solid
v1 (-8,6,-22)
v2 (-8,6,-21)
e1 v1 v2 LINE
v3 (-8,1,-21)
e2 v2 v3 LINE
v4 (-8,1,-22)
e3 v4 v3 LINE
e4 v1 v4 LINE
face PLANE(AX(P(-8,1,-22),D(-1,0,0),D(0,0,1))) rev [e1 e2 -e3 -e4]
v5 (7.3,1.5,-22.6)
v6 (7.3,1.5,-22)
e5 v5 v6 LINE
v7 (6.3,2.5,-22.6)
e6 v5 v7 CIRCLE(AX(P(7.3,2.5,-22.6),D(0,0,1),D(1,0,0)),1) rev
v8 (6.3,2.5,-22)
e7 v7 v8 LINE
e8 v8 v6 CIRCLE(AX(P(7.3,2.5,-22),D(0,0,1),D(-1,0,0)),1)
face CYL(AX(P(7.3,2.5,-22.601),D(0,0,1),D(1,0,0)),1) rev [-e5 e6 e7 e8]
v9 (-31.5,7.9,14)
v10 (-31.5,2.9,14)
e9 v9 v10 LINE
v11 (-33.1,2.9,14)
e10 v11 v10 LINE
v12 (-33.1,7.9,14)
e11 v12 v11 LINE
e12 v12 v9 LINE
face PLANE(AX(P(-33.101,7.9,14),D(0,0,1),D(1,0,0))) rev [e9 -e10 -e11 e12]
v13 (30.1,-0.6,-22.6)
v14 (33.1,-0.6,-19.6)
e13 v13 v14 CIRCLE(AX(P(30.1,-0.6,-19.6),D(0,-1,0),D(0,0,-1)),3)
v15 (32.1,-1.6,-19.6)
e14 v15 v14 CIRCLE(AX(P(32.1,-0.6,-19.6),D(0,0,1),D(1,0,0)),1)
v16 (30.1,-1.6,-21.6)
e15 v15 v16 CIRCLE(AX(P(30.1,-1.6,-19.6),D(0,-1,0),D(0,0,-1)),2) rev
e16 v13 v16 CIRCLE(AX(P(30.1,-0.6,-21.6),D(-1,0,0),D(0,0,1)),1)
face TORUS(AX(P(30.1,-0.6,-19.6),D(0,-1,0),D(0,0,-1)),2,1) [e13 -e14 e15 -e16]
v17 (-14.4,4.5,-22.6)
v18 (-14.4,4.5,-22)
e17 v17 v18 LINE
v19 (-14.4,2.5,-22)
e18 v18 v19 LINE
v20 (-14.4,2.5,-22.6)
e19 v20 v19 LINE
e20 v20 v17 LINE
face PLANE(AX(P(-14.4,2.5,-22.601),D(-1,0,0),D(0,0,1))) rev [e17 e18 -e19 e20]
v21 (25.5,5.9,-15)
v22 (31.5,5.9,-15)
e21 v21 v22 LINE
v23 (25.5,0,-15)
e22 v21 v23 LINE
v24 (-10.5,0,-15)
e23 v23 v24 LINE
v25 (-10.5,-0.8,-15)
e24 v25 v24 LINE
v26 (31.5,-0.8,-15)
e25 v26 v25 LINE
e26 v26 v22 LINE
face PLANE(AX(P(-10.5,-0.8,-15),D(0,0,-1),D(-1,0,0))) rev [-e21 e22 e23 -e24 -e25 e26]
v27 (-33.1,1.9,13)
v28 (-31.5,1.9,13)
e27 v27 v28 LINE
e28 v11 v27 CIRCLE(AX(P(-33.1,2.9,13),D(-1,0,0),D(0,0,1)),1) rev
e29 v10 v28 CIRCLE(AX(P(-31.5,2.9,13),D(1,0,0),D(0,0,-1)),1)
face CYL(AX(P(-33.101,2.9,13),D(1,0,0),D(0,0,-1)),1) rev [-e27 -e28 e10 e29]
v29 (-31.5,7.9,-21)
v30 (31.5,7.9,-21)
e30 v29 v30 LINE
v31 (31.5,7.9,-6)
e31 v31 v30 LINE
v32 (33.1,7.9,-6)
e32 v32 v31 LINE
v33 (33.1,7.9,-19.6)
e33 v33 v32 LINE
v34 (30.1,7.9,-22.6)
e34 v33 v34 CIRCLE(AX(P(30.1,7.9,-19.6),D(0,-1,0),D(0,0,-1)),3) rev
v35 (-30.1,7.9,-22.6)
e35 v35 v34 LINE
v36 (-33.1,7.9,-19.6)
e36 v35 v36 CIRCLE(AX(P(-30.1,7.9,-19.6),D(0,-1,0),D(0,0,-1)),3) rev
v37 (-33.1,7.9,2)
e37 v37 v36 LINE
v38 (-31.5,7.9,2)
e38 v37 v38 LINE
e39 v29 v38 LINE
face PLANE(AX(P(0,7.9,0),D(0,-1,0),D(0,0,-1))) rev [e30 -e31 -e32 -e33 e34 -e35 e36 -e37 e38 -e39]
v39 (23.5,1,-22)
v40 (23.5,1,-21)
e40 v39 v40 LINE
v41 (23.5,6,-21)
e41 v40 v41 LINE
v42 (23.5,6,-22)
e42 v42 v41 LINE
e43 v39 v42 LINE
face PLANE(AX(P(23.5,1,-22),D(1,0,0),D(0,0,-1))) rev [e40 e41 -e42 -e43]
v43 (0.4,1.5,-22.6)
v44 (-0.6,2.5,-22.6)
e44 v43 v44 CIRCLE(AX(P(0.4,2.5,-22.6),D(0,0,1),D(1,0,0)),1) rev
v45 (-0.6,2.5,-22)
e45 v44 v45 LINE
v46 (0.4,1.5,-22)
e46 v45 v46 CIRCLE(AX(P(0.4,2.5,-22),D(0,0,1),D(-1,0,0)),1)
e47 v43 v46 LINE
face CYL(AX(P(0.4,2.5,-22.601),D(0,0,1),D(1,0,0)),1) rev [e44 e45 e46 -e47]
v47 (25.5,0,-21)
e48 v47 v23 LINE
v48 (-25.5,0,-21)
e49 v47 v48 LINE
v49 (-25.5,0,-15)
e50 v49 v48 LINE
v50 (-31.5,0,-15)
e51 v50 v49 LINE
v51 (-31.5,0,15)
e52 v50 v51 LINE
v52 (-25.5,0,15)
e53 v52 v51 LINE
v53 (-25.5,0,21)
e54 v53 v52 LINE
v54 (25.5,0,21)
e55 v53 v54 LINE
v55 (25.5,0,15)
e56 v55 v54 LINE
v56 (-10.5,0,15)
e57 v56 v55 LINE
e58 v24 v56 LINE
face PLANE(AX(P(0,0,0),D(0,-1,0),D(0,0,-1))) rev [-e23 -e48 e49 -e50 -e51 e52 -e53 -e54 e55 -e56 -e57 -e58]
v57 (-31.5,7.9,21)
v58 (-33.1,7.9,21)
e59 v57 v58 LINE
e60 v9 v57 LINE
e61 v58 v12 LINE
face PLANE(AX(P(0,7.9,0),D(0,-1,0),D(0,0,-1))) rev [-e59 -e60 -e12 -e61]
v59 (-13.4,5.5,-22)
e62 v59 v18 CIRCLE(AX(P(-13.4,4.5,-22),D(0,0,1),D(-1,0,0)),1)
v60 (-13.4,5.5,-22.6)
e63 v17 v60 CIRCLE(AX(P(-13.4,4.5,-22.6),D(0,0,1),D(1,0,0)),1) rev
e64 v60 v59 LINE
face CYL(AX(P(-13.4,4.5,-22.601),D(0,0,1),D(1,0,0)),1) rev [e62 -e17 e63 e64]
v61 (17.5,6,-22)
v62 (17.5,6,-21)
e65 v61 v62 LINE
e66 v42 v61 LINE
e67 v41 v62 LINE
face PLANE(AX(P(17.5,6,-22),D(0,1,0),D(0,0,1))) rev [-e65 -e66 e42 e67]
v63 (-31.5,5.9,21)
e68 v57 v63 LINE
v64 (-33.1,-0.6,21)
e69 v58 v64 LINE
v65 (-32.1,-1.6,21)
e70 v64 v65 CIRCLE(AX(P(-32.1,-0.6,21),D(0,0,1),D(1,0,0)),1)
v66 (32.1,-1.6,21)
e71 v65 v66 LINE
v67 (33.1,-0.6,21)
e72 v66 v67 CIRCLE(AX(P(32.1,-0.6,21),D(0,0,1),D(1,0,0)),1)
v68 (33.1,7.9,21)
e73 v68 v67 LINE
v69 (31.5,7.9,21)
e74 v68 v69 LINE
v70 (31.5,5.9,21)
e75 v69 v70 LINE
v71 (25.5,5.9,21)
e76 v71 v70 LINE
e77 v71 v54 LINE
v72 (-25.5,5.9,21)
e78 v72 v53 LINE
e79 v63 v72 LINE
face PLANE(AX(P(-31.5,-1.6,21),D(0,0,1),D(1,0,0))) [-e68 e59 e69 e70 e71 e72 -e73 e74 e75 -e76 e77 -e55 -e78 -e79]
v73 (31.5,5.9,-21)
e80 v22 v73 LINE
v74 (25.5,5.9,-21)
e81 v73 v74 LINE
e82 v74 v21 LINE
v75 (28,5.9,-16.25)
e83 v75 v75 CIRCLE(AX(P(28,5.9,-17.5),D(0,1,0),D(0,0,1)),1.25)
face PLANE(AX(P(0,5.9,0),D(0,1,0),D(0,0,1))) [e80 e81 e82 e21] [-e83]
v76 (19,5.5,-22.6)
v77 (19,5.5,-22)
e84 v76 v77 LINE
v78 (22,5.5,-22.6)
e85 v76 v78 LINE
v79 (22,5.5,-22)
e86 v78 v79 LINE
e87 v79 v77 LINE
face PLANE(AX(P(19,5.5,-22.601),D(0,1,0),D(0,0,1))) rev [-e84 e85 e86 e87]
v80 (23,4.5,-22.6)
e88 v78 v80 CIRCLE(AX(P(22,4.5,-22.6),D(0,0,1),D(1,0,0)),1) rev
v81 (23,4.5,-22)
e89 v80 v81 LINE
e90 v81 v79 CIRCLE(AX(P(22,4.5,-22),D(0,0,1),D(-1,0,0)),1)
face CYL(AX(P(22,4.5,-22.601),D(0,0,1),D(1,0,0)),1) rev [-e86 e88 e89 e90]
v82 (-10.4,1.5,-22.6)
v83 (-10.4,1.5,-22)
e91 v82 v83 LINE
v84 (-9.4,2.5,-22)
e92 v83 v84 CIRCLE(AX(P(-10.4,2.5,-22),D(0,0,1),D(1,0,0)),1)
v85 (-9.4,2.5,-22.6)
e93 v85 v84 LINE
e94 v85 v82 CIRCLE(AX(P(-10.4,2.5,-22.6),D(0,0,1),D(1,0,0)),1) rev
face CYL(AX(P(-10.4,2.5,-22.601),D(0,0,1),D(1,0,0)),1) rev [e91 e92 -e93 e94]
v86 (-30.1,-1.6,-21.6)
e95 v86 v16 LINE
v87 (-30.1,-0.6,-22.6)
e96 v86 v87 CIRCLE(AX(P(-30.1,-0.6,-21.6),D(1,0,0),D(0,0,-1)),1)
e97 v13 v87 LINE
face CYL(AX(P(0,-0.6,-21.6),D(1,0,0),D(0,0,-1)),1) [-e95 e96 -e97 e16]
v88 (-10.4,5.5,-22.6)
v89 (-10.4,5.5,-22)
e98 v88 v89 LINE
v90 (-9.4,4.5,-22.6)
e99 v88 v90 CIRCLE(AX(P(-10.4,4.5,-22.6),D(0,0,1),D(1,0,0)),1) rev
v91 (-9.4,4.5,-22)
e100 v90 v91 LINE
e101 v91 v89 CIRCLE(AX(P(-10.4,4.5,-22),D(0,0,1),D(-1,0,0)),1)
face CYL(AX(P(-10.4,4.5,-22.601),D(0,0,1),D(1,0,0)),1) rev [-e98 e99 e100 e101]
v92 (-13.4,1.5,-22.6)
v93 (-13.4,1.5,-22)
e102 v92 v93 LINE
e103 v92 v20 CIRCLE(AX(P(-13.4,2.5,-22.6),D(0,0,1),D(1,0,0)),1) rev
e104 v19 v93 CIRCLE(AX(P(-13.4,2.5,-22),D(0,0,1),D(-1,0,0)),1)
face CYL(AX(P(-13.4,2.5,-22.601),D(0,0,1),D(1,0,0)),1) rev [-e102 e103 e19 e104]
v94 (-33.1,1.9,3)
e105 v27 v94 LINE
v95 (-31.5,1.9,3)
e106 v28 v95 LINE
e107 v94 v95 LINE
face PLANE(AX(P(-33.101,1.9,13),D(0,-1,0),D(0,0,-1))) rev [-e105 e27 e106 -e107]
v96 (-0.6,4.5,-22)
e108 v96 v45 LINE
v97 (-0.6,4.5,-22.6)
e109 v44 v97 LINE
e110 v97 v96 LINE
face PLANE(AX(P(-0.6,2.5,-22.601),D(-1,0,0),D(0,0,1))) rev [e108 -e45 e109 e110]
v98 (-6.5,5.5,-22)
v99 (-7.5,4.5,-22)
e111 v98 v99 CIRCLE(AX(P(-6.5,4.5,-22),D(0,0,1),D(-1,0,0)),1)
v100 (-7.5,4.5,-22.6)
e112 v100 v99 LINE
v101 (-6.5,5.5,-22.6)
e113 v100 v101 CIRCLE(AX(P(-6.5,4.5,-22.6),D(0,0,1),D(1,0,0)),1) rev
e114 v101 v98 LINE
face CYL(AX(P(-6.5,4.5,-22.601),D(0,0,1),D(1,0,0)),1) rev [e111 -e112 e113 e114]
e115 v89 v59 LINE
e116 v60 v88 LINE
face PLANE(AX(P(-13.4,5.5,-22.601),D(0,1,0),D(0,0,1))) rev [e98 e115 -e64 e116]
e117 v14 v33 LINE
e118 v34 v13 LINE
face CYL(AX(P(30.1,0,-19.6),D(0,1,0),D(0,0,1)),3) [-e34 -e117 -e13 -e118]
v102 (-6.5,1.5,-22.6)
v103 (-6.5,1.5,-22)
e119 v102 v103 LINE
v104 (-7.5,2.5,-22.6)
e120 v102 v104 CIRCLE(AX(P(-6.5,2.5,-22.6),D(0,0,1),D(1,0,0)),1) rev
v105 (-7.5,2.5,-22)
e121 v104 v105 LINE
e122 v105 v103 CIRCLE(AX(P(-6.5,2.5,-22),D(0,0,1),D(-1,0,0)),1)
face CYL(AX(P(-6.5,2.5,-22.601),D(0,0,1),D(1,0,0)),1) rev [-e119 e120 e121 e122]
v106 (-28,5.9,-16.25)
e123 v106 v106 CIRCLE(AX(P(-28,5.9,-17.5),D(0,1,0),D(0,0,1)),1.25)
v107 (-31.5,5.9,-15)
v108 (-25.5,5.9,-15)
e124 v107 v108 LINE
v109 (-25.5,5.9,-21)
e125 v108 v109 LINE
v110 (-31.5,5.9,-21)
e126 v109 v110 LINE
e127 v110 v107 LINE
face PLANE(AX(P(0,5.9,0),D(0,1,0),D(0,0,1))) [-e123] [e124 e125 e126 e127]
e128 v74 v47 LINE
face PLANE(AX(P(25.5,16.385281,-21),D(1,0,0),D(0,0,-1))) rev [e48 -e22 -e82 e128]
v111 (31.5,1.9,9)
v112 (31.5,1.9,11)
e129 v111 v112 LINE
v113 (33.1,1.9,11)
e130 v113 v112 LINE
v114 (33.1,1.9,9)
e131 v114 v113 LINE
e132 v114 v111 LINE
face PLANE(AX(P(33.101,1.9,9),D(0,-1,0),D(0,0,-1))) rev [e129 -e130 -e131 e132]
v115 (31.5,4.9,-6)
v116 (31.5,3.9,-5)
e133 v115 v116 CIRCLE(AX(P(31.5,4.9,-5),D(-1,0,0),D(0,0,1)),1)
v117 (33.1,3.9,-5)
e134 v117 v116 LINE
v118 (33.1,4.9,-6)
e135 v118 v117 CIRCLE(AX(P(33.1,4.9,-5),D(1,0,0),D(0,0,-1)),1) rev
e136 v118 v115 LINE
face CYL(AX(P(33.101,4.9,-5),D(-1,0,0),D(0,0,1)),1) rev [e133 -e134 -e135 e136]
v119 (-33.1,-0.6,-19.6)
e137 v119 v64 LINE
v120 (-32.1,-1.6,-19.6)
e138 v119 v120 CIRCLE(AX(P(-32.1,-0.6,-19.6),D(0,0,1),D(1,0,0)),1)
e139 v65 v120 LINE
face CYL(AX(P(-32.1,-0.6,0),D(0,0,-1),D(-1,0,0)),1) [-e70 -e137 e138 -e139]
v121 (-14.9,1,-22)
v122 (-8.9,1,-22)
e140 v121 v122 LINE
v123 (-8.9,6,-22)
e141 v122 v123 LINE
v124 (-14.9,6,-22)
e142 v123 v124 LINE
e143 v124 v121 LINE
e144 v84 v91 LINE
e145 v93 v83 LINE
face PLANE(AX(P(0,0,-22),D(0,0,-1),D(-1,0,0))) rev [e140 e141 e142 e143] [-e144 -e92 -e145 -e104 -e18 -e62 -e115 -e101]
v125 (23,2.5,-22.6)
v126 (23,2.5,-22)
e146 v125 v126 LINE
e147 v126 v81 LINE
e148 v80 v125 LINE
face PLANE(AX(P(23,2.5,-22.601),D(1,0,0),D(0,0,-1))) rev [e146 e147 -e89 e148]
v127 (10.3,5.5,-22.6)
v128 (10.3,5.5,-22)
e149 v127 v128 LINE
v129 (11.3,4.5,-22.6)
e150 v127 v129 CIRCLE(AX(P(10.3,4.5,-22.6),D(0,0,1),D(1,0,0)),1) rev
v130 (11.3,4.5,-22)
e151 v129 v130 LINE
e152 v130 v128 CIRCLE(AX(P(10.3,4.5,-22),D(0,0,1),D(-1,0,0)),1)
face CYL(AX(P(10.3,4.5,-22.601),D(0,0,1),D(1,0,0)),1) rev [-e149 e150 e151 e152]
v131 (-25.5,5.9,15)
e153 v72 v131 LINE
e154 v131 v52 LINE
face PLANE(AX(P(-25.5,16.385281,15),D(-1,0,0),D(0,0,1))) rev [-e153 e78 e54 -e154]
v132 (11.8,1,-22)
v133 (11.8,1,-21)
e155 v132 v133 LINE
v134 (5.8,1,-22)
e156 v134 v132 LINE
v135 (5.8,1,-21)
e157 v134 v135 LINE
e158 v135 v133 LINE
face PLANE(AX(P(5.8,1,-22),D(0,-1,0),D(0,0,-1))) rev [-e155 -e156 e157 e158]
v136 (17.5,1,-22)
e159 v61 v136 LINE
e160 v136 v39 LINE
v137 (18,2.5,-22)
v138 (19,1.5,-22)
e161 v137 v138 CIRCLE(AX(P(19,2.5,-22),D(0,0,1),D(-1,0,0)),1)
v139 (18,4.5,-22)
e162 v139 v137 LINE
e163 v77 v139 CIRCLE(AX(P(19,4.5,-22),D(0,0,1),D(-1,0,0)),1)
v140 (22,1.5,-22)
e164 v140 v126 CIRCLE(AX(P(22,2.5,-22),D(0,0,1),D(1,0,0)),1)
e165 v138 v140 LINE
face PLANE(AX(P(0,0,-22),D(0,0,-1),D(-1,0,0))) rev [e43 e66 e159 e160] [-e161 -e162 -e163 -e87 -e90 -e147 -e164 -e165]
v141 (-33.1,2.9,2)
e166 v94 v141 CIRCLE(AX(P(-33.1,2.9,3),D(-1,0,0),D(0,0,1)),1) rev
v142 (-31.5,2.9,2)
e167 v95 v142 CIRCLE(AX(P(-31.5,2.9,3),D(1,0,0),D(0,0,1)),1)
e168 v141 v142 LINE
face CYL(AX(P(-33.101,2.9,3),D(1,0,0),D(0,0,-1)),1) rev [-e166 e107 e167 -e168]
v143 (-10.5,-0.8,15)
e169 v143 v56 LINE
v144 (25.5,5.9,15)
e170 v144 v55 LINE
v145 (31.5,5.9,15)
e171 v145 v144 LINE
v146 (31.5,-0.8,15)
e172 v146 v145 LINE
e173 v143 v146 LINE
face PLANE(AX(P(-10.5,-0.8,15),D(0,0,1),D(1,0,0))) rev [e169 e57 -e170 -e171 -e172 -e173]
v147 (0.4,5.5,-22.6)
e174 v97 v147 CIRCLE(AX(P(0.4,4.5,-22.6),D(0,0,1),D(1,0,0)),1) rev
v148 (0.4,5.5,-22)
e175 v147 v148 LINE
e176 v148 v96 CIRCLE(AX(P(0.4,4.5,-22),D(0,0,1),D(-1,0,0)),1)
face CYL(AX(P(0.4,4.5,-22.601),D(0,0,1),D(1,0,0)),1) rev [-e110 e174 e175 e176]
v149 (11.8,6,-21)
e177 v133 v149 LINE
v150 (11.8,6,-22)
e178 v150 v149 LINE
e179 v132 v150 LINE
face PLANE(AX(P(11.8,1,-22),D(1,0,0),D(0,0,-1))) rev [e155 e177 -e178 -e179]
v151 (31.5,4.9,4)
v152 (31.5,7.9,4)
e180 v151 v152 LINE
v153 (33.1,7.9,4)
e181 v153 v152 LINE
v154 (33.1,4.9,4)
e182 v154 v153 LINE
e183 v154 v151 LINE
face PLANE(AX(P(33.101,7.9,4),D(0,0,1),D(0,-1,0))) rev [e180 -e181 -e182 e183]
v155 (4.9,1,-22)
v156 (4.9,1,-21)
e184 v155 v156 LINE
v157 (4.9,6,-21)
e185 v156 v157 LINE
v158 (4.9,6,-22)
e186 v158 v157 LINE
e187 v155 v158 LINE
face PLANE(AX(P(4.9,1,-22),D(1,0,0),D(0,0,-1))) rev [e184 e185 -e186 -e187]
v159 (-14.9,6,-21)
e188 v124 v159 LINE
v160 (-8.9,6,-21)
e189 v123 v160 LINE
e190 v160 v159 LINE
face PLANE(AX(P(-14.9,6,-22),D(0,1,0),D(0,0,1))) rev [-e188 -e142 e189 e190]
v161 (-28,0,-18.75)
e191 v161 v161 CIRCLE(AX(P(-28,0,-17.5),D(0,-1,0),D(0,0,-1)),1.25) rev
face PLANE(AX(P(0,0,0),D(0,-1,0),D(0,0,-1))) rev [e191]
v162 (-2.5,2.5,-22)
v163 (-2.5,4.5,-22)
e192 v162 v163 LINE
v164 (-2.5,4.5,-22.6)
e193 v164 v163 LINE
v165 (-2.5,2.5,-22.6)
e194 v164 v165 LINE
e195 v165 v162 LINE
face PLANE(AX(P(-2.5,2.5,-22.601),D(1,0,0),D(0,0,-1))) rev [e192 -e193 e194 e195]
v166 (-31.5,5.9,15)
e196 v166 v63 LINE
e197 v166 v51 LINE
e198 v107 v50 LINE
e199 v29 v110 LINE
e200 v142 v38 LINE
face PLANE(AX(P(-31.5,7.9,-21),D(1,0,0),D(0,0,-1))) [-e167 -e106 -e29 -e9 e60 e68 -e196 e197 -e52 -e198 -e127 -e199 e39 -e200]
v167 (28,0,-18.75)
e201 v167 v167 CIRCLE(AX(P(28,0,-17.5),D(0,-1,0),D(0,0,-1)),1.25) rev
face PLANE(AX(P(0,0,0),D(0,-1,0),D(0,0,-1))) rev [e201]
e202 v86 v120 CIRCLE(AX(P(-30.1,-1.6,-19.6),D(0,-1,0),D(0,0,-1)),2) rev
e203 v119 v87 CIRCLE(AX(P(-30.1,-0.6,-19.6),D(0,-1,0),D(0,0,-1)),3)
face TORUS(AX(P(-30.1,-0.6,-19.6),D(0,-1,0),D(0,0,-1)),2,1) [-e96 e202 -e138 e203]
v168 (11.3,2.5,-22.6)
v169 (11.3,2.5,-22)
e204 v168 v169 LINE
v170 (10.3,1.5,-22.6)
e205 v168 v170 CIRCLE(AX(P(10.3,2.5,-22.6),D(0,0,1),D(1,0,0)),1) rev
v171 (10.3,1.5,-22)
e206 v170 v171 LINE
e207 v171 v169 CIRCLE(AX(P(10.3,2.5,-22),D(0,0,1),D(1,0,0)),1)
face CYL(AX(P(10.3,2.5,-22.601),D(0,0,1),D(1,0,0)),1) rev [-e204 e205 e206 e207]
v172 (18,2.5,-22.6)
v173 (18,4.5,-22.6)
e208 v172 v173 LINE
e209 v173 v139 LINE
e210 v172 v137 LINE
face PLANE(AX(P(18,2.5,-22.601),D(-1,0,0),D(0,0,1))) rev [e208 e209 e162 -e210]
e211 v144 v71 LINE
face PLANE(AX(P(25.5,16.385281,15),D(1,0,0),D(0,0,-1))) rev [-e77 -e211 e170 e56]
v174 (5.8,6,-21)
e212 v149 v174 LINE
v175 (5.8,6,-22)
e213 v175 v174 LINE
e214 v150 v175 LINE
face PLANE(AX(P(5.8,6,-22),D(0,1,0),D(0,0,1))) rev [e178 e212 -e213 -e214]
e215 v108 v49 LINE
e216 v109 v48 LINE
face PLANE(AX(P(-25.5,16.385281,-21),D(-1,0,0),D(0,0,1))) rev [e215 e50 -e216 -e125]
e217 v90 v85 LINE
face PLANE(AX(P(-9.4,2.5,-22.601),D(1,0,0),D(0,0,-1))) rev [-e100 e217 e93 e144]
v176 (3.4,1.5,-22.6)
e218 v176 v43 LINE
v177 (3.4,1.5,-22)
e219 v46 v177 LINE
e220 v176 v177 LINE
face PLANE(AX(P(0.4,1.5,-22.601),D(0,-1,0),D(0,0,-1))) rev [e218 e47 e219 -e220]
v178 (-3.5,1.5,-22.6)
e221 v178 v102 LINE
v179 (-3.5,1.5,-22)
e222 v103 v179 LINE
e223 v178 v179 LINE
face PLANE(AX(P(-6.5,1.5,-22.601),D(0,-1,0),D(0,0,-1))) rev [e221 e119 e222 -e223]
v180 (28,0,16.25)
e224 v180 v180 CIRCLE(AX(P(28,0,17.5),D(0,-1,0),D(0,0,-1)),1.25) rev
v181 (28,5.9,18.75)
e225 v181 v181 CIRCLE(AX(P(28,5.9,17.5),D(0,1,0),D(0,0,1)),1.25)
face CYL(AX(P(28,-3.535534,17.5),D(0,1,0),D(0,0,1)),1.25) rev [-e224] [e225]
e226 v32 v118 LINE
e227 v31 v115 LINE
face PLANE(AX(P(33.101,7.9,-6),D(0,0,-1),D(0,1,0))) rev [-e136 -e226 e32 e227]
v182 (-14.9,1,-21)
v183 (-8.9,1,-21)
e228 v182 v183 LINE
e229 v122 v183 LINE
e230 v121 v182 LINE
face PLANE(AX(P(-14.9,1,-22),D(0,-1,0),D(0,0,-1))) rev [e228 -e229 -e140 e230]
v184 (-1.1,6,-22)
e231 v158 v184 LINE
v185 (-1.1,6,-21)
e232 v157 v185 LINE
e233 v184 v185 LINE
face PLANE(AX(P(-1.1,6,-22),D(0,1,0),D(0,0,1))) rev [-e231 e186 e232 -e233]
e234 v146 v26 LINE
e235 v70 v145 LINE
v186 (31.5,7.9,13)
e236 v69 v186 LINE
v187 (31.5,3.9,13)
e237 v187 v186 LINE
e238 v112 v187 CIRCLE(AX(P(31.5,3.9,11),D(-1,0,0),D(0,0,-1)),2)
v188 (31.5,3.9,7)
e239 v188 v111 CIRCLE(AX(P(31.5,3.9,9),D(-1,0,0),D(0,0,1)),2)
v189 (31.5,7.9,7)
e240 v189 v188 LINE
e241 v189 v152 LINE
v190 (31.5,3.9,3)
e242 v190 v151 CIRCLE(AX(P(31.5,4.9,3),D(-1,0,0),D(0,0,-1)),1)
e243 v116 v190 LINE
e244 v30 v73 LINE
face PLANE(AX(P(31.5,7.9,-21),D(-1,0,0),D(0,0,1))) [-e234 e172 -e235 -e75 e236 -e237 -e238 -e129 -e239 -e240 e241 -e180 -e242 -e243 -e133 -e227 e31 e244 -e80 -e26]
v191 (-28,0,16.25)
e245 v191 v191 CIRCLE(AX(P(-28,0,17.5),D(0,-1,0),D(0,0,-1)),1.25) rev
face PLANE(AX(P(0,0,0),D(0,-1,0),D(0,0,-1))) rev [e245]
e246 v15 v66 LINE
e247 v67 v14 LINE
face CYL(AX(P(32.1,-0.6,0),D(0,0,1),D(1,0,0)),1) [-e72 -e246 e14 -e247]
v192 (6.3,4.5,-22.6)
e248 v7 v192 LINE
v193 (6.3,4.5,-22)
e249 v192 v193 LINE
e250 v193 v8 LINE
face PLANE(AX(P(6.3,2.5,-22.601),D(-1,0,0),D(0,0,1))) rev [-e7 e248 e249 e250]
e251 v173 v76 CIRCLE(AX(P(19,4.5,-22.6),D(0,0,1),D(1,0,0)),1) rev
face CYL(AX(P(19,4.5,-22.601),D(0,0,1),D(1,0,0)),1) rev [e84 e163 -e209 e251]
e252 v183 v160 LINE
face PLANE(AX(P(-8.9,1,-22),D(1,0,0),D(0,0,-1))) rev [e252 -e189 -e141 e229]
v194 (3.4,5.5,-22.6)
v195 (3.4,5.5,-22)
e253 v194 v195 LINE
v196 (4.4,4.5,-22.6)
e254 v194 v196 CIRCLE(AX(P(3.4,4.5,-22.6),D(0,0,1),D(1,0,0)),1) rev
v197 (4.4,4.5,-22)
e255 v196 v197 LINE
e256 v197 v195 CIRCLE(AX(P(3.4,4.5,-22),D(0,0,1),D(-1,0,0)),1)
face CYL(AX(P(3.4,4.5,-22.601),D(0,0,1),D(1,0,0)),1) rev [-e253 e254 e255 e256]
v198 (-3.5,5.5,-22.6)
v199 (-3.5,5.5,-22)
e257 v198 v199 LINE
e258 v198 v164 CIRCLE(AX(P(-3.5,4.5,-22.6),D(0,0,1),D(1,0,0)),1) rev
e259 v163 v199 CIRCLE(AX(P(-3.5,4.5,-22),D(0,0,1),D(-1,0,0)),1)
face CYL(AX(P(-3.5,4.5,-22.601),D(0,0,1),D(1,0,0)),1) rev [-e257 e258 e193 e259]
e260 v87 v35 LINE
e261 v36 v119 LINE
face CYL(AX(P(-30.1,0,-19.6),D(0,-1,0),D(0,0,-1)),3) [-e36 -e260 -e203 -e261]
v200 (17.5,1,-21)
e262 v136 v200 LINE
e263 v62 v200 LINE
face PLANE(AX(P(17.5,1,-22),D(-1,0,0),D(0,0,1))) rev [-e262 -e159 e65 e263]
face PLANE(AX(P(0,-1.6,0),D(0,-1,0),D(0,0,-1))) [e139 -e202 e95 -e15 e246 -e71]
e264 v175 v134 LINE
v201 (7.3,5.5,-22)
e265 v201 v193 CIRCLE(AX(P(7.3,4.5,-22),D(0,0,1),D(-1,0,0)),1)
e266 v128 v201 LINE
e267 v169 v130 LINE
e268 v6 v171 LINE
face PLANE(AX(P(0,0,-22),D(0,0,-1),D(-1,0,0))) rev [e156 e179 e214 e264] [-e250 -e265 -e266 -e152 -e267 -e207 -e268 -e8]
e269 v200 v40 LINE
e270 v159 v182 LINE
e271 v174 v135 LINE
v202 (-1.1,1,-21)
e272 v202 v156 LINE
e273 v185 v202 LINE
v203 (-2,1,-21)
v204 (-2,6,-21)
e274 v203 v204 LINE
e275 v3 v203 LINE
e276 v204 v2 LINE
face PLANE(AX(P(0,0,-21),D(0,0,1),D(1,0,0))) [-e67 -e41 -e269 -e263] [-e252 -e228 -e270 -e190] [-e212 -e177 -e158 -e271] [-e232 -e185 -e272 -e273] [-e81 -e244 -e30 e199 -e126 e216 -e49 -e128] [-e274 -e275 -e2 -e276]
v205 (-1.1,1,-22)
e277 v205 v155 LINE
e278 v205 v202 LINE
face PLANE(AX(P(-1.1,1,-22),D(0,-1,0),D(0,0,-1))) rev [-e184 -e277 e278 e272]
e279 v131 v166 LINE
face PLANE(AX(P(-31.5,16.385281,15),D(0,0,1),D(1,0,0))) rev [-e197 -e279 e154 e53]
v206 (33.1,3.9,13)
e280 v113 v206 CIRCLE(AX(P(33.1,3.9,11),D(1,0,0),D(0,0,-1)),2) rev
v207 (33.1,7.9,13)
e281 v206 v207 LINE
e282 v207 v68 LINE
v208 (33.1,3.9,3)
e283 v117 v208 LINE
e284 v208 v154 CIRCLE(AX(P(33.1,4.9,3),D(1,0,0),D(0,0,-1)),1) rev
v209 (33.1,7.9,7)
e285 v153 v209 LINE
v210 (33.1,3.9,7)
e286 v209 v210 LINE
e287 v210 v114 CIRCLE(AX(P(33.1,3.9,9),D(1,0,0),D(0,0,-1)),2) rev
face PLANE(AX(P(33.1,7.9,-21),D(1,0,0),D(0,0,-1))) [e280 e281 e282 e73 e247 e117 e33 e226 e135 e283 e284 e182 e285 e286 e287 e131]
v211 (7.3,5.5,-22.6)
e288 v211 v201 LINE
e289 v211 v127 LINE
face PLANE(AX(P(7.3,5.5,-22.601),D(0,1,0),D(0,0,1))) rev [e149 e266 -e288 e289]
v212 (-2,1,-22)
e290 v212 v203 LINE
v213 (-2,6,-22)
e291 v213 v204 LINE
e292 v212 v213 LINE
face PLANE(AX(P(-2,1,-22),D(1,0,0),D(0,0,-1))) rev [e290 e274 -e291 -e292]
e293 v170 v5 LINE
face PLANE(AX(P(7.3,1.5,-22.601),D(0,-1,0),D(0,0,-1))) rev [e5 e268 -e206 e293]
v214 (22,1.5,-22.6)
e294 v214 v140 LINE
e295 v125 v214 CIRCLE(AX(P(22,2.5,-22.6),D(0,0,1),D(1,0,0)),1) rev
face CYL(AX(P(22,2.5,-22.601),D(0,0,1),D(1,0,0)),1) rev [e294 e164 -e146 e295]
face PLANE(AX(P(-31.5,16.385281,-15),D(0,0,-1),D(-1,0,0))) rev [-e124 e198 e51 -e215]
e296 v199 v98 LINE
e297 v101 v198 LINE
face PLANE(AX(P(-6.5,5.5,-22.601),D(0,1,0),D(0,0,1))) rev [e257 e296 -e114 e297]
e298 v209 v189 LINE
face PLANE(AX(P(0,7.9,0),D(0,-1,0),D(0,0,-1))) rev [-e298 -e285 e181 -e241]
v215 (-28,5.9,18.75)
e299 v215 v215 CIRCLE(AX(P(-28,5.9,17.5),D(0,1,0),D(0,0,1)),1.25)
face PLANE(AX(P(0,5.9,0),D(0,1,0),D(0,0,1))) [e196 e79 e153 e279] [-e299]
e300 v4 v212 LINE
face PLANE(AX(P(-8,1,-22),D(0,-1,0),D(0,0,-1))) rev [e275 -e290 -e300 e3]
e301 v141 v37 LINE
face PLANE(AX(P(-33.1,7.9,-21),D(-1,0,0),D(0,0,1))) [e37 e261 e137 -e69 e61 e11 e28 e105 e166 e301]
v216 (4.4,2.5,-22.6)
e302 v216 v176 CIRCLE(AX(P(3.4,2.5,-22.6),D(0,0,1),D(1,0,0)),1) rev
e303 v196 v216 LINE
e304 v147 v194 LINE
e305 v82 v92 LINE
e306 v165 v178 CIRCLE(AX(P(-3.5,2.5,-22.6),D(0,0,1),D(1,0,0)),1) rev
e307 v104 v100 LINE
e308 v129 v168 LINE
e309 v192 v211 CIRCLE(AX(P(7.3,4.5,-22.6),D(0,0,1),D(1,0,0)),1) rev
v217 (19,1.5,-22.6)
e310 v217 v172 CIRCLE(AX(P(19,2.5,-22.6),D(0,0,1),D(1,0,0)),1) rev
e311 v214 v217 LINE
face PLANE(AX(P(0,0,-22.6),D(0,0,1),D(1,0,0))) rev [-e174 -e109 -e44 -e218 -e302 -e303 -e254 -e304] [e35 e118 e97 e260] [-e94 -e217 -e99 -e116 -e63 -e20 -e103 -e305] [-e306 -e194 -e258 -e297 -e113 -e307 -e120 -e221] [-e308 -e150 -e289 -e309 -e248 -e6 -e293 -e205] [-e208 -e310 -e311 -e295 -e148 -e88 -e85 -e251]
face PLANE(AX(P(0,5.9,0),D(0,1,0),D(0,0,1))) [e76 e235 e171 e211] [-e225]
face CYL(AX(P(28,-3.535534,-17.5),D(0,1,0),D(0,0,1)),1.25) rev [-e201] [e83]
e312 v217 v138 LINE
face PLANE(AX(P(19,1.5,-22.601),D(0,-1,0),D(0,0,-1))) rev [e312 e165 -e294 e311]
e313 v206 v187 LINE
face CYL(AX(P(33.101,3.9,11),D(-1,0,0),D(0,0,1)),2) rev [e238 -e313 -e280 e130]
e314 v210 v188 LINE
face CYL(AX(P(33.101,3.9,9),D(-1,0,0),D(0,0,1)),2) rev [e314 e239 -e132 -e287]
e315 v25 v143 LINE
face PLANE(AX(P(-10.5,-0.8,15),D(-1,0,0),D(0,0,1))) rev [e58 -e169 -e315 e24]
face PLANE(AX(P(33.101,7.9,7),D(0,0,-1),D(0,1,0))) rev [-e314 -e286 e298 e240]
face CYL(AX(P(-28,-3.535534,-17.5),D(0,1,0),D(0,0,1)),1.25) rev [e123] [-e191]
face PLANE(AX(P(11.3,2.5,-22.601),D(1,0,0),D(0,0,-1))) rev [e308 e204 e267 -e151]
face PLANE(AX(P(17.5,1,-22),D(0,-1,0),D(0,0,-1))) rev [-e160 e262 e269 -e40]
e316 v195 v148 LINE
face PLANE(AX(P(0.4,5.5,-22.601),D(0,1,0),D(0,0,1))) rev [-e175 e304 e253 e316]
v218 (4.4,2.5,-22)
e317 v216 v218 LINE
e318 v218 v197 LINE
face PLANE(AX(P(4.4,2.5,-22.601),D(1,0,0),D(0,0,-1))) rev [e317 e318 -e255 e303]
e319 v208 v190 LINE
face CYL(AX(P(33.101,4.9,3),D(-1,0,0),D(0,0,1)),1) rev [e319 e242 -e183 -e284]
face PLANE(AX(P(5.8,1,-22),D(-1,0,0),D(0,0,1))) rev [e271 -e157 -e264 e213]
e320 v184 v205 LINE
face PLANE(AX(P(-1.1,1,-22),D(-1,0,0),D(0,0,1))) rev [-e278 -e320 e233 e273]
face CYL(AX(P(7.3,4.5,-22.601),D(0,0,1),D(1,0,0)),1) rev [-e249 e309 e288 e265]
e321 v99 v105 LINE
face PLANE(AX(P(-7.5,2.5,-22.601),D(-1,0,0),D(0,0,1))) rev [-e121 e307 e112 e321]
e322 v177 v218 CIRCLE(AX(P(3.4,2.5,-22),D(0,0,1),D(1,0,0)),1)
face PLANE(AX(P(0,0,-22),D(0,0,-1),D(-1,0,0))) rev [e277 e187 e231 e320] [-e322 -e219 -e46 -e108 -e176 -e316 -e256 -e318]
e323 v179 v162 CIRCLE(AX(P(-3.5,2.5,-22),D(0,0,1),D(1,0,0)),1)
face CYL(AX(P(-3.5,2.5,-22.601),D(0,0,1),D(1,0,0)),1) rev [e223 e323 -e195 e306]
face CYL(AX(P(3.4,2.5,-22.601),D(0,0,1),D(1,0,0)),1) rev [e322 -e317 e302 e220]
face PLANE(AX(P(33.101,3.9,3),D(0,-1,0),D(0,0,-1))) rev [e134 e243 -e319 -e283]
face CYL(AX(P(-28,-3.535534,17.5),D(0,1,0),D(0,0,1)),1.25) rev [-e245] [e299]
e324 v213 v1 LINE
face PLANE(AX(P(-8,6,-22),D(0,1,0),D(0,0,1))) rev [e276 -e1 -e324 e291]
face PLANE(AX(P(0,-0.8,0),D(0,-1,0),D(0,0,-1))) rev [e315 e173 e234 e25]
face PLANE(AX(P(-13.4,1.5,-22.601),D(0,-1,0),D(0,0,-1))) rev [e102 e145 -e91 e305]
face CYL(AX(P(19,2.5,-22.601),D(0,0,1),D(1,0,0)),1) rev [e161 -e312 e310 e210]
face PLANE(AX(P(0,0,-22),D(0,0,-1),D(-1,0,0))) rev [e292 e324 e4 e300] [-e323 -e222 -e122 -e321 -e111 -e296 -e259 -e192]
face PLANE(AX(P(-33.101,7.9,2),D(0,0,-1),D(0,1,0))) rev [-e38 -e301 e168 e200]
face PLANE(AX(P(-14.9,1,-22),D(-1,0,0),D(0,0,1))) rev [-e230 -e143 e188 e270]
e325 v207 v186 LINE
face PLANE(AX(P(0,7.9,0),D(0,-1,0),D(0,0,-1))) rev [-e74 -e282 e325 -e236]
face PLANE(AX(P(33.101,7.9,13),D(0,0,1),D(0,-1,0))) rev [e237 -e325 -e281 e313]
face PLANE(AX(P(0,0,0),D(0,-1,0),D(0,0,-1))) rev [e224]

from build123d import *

# Parameters (mm, degrees)
SKETCH_1_W             = 63
SKETCH_1_H             = 42
EXTRUDE_298_DEPTH      = 1.6
SKETCH_2_W             = 42
SKETCH_2_H             = 30
CUT_EXTRUDE_670_DEPTH  = 0.8
SKETCH_4_W             = 1.6
SKETCH_4_H             = 42
EXTRUDE_914_DEPTH      = 9.5
SKETCH_5_W             = 6
SKETCH_5_H             = 6
EXTRUDE_1303_DEPTH     = 5.9
SKETCH_6_R             = 1.25
CUT_EXTRUDE_1636_DEPTH = 7.9
SKETCH_9_W             = 66.2
SKETCH_9_H             = 9.5
EXTRUDE_4_DEPTH        = 1.6
SKETCH_10_W            = 6
SKETCH_10_H            = 5
CUT_EXTRUDE_2759_DEPTH = 1
CUT_EXTRUDE_3267_REACH = 56.836
FILLET_4_R             = 1
FILLET_5_R             = 3
TF_REACH               = 70.894
CUT_EXTRUDE_1_REACH    = 70.894


with BuildPart() as part:
    # 草图1 → Extrude 298 (new body)
    with BuildSketch(Plane(origin=(0, 0, 0), x_dir=(1, 0, 0), z_dir=(0, 1, 0))):
        Rectangle(SKETCH_1_W, SKETCH_1_H)
    extrude(amount=-EXTRUDE_298_DEPTH)

    # 草图2 → Cut-Extrude 670 (cut)
    with BuildSketch(Plane(origin=(0, 0, 0), x_dir=(1, 0, 0), z_dir=(0, 1, 0))):
        with Locations((10.5, 0)):
            Rectangle(SKETCH_2_W, SKETCH_2_H)
    extrude(amount=-CUT_EXTRUDE_670_DEPTH, mode=Mode.SUBTRACT)

    # 草图4 → Extrude 914 (add)
    with BuildSketch(Plane(origin=(0, -1.6, 0), x_dir=(-1, 0, 0), z_dir=(0, -1, 0))):
        with Locations((-32.3, 0)):
            Rectangle(SKETCH_4_W, SKETCH_4_H)
        with Locations((32.3, 0)):
            Rectangle(SKETCH_4_W, SKETCH_4_H)
    extrude(amount=-EXTRUDE_914_DEPTH)

    # 草图5 → Extrude 1303 (add)
    with BuildSketch(Plane(origin=(0, 0, 0), x_dir=(1, 0, 0), z_dir=(0, 1, 0))):
        with Locations((-28.5, 18)):
            Rectangle(SKETCH_5_W, SKETCH_5_H)
        with Locations((28.5, 18)):
            Rectangle(SKETCH_5_W, SKETCH_5_H)
        with Locations((-28.5, -18)):
            Rectangle(SKETCH_5_W, SKETCH_5_H)
        with Locations((28.5, -18)):
            Rectangle(SKETCH_5_W, SKETCH_5_H)
    extrude(amount=EXTRUDE_1303_DEPTH)

    # 草图6 → Cut-Extrude 1636 (cut)
    with BuildSketch(Plane(origin=(0, 7.9, 0), x_dir=(1, 0, 0), z_dir=(0, 1, 0))):
        with Locations(Location((-28, 17.5, 0), (0, 0, 270))):
            Circle(SKETCH_6_R)
        with Locations(Location((28, 17.5, 0), (0, 0, 270))):
            Circle(SKETCH_6_R)
        with Locations(Location((28, -17.5, 0), (0, 0, 270))):
            Circle(SKETCH_6_R)
        with Locations(Location((-28, -17.5, 0), (0, 0, 270))):
            Circle(SKETCH_6_R)
    extrude(amount=-CUT_EXTRUDE_1636_DEPTH, mode=Mode.SUBTRACT)

    # 草图9 → 凸台-拉伸4 (add)
    with BuildSketch(Plane(origin=(0, 0, -21), x_dir=(-1, 0, 0), z_dir=(0, 0, -1))):
        with Locations((0, 3.15)):
            Rectangle(SKETCH_9_W, SKETCH_9_H)
    extrude(amount=EXTRUDE_4_DEPTH)

    # 草图10 → Cut-Extrude 2759 (cut)
    with BuildSketch(Plane.XY.offset(-21)):
        with Locations((20.5, 3.5)):
            Rectangle(SKETCH_10_W, SKETCH_10_H)
        with Locations((8.8, 3.5)):
            Rectangle(SKETCH_10_W, SKETCH_10_H)
        with Locations((1.9, 3.5)):
            Rectangle(SKETCH_10_W, SKETCH_10_H)
        with Locations((-5, 3.5)):
            Rectangle(SKETCH_10_W, SKETCH_10_H)
        with Locations((-11.9, 3.5)):
            Rectangle(SKETCH_10_W, SKETCH_10_H)
    extrude(amount=-CUT_EXTRUDE_2759_DEPTH, mode=Mode.SUBTRACT)

    # 草图12 → Cut-Extrude 3267 (cut, up to next)
    with BuildSketch(Plane.XY.offset(-22), mode=Mode.PRIVATE) as cut_extrude_3267_sk1:
        with BuildLine():
            Line((6.3, 2.5), (6.3, 4.5))
            ThreePointArc((6.3, 4.5), (6.592893219, 5.207106781), (7.3, 5.5))
            Line((7.3, 5.5), (10.3, 5.5))
            ThreePointArc((10.3, 5.5), (11.007106781, 5.207106781), (11.3, 4.5))
            Line((11.3, 4.5), (11.3, 2.5))
            ThreePointArc((11.3, 2.5), (11.007106781, 1.792893219), (10.3, 1.5))
            Line((10.3, 1.5), (7.3, 1.5))
            ThreePointArc((7.3, 1.5), (6.592893219, 1.792893219), (6.3, 2.5))
        make_face()
    cut_extrude_3267_tool1 = extrude(cut_extrude_3267_sk1.sketch, amount=-CUT_EXTRUDE_3267_REACH, mode=Mode.PRIVATE) & part.part
    # 草图12 → Cut-Extrude 3267 (cut, up to next)
    with BuildSketch(Plane.XY.offset(-22), mode=Mode.PRIVATE) as cut_extrude_3267_sk2:
        with BuildLine():
            Line((19, 1.5), (22, 1.5))
            ThreePointArc((22, 1.5), (22.707106781, 1.792893219), (23, 2.5))
            Line((23, 2.5), (23, 4.5))
            ThreePointArc((23, 4.5), (22.707106781, 5.207106781), (22, 5.5))
            Line((22, 5.5), (19, 5.5))
            ThreePointArc((19, 5.5), (18.292893219, 5.207106781), (18, 4.5))
            Line((18, 4.5), (18, 2.5))
            ThreePointArc((18, 2.5), (18.292893219, 1.792893219), (19, 1.5))
        make_face()
    cut_extrude_3267_tool2 = extrude(cut_extrude_3267_sk2.sketch, amount=-CUT_EXTRUDE_3267_REACH, mode=Mode.PRIVATE) & part.part
    # 草图12 → Cut-Extrude 3267 (cut, up to next)
    with BuildSketch(Plane.XY.offset(-22), mode=Mode.PRIVATE) as cut_extrude_3267_sk3:
        with BuildLine():
            Line((-0.6, 2.5), (-0.6, 4.5))
            ThreePointArc((-0.6, 4.5), (-0.307106781, 5.207106781), (0.4, 5.5))
            Line((0.4, 5.5), (3.4, 5.5))
            ThreePointArc((3.4, 5.5), (4.107106781, 5.207106781), (4.4, 4.5))
            Line((4.4, 4.5), (4.4, 2.5))
            ThreePointArc((4.4, 2.5), (4.107106781, 1.792893219), (3.4, 1.5))
            Line((3.4, 1.5), (0.4, 1.5))
            ThreePointArc((0.4, 1.5), (-0.307106781, 1.792893219), (-0.6, 2.5))
        make_face()
    cut_extrude_3267_tool3 = extrude(cut_extrude_3267_sk3.sketch, amount=-CUT_EXTRUDE_3267_REACH, mode=Mode.PRIVATE) & part.part
    # 草图12 → Cut-Extrude 3267 (cut, up to next)
    with BuildSketch(Plane.XY.offset(-22), mode=Mode.PRIVATE) as cut_extrude_3267_sk4:
        with BuildLine():
            Line((-7.5, 2.5), (-7.5, 4.5))
            ThreePointArc((-7.5, 4.5), (-7.207106781, 5.207106781), (-6.5, 5.5))
            Line((-6.5, 5.5), (-3.5, 5.5))
            ThreePointArc((-3.5, 5.5), (-2.792893219, 5.207106781), (-2.5, 4.5))
            Line((-2.5, 4.5), (-2.5, 2.5))
            ThreePointArc((-2.5, 2.5), (-2.792893219, 1.792893219), (-3.5, 1.5))
            Line((-3.5, 1.5), (-6.5, 1.5))
            ThreePointArc((-6.5, 1.5), (-7.207106781, 1.792893219), (-7.5, 2.5))
        make_face()
    cut_extrude_3267_tool4 = extrude(cut_extrude_3267_sk4.sketch, amount=-CUT_EXTRUDE_3267_REACH, mode=Mode.PRIVATE) & part.part
    # 草图12 → Cut-Extrude 3267 (cut, up to next)
    with BuildSketch(Plane.XY.offset(-22), mode=Mode.PRIVATE) as cut_extrude_3267_sk5:
        with BuildLine():
            Line((-14.4, 2.5), (-14.4, 4.5))
            ThreePointArc((-14.4, 4.5), (-14.107106781, 5.207106781), (-13.4, 5.5))
            Line((-13.4, 5.5), (-10.4, 5.5))
            ThreePointArc((-10.4, 5.5), (-9.692893219, 5.207106781), (-9.4, 4.5))
            Line((-9.4, 4.5), (-9.4, 2.5))
            ThreePointArc((-9.4, 2.5), (-9.692893219, 1.792893219), (-10.4, 1.5))
            Line((-10.4, 1.5), (-13.4, 1.5))
            ThreePointArc((-13.4, 1.5), (-14.107106781, 1.792893219), (-14.4, 2.5))
        make_face()
    cut_extrude_3267_tool5 = extrude(cut_extrude_3267_sk5.sketch, amount=-CUT_EXTRUDE_3267_REACH, mode=Mode.PRIVATE) & part.part
    add(cut_extrude_3267_tool1.solids().sort_by_distance((8.8, 3.5, -22))[0], mode=Mode.SUBTRACT)
    add(cut_extrude_3267_tool2.solids().sort_by_distance((20.5, 3.5, -22))[0], mode=Mode.SUBTRACT)
    add(cut_extrude_3267_tool3.solids().sort_by_distance((1.9, 3.5, -22))[0], mode=Mode.SUBTRACT)
    add(cut_extrude_3267_tool4.solids().sort_by_distance((-5, 3.5, -22))[0], mode=Mode.SUBTRACT)
    add(cut_extrude_3267_tool5.solids().sort_by_distance((-11.9, 3.5, -22))[0], mode=Mode.SUBTRACT)

    # 圆角4
    fillet_4_edges = [part.edges().sort_by_distance(p)[0] for p in [
        (0, -1.6, -22.6),
        (33.1, -1.6, -0.8),
        (-33.1, -1.6, -0.8),
    ]]
    fillet(fillet_4_edges, radius=FILLET_4_R)

    # 圆角5
    # the kernel refuses this fillet: 3 mm, written as the material it takes off along each edge
    with BuildSketch(Plane(origin=(30.1, -1.6, -19.6), x_dir=(0, 0, -1), z_dir=(-1, 0, 0))) as fillet_5_piece_1:
        with BuildLine():
            CenterArc((2, -1), 1, 0, 90)
            Line((3, -1), (3, 0))
            Line((3, 0), (2, 0))
        make_face()
    revolve(axis=Axis((30.1, -1.6, -19.6), (0, -1, 0)), revolution_arc=90, mode=Mode.SUBTRACT)
    with BuildSketch(Plane(origin=(-30.1, -1.6, -19.6), x_dir=(-1, 0, 0), z_dir=(0, 0, 1))) as fillet_5_piece_2:
        with BuildLine():
            CenterArc((2, -1), 1, 0, 90)
            Line((3, -1), (3, 0))
            Line((3, 0), (2, 0))
        make_face()
    revolve(axis=Axis((-30.1, -1.6, -19.6), (0, -1, 0)), revolution_arc=90, mode=Mode.SUBTRACT)
    with BuildSketch(Plane(origin=(33.1, 15.4, -22.6), x_dir=(0, 0, 1), z_dir=(0, -1, 0)), Plane(origin=(-33.1, -1.6, -22.6), x_dir=(0, 0, 1), z_dir=(0, 1, 0))) as fillet_5_piece_3:
        with BuildLine():
            CenterArc((FILLET_5_R, FILLET_5_R), FILLET_5_R, 180, 90)
            Line((0, FILLET_5_R), (0, 0))
            Line((0, 0), (FILLET_5_R, 0))
        make_face()
    extrude(amount=17, mode=Mode.SUBTRACT)

    # 草图16 → tf (cut, up to next)
    with BuildSketch(Plane(origin=(-31.5, 0, 0), x_dir=(0, 0, -1), z_dir=(1, 0, 0)), mode=Mode.PRIVATE) as tf_sk1:
        with BuildLine():
            Line((-14, 7.9), (-2, 7.9))
            Line((-2, 7.9), (-2, 2.9))
            ThreePointArc((-2, 2.9), (-2.292893219, 2.192893219), (-3, 1.9))
            Line((-3, 1.9), (-13, 1.9))
            ThreePointArc((-13, 1.9), (-13.707106781, 2.192893219), (-14, 2.9))
            Line((-14, 2.9), (-14, 7.9))
        make_face()
    tf_tool1 = extrude(tf_sk1.sketch, amount=-TF_REACH, mode=Mode.PRIVATE) & part.part
    add(tf_tool1.solids().sort_by_distance((-31.5, 4.916651, 8))[0], mode=Mode.SUBTRACT)

    # 草图17 → 切除-拉伸1 (cut, up to next)
    with BuildSketch(Plane.ZY.offset(-31.5), mode=Mode.PRIVATE) as cut_extrude_1_sk1:
        with BuildLine():
            Line((7, 7.9), (13, 7.9))
            Line((13, 7.9), (13, 3.9))
            ThreePointArc((13, 3.9), (12.414213562, 2.485786438), (11, 1.9))
            Line((11, 1.9), (9, 1.9))
            ThreePointArc((9, 1.9), (7.585786438, 2.485786438), (7, 3.9))
            Line((7, 3.9), (7, 7.9))
        make_face()
    cut_extrude_1_tool1 = extrude(cut_extrude_1_sk1.sketch, amount=-CUT_EXTRUDE_1_REACH, mode=Mode.PRIVATE) & part.part
    # 草图17 → 切除-拉伸1 (cut, up to next)
    with BuildSketch(Plane.ZY.offset(-31.5), mode=Mode.PRIVATE) as cut_extrude_1_sk2:
        with BuildLine():
            Line((4, 7.9), (-6, 7.9))
            Line((-6, 7.9), (-6, 4.9))
            ThreePointArc((-6, 4.9), (-5.707106781, 4.192893219), (-5, 3.9))
            Line((-5, 3.9), (3, 3.9))
            ThreePointArc((3, 3.9), (3.707106781, 4.192893219), (4, 4.9))
            Line((4, 4.9), (4, 7.9))
        make_face()
    cut_extrude_1_tool2 = extrude(cut_extrude_1_sk2.sketch, amount=-CUT_EXTRUDE_1_REACH, mode=Mode.PRIVATE) & part.part
    add(cut_extrude_1_tool1.solids().sort_by_distance((31.5, 5.027861, 10))[0], mode=Mode.SUBTRACT)
    add(cut_extrude_1_tool2.solids().sort_by_distance((31.5, 5.91927, -1))[0], mode=Mode.SUBTRACT)


solid = part.part
